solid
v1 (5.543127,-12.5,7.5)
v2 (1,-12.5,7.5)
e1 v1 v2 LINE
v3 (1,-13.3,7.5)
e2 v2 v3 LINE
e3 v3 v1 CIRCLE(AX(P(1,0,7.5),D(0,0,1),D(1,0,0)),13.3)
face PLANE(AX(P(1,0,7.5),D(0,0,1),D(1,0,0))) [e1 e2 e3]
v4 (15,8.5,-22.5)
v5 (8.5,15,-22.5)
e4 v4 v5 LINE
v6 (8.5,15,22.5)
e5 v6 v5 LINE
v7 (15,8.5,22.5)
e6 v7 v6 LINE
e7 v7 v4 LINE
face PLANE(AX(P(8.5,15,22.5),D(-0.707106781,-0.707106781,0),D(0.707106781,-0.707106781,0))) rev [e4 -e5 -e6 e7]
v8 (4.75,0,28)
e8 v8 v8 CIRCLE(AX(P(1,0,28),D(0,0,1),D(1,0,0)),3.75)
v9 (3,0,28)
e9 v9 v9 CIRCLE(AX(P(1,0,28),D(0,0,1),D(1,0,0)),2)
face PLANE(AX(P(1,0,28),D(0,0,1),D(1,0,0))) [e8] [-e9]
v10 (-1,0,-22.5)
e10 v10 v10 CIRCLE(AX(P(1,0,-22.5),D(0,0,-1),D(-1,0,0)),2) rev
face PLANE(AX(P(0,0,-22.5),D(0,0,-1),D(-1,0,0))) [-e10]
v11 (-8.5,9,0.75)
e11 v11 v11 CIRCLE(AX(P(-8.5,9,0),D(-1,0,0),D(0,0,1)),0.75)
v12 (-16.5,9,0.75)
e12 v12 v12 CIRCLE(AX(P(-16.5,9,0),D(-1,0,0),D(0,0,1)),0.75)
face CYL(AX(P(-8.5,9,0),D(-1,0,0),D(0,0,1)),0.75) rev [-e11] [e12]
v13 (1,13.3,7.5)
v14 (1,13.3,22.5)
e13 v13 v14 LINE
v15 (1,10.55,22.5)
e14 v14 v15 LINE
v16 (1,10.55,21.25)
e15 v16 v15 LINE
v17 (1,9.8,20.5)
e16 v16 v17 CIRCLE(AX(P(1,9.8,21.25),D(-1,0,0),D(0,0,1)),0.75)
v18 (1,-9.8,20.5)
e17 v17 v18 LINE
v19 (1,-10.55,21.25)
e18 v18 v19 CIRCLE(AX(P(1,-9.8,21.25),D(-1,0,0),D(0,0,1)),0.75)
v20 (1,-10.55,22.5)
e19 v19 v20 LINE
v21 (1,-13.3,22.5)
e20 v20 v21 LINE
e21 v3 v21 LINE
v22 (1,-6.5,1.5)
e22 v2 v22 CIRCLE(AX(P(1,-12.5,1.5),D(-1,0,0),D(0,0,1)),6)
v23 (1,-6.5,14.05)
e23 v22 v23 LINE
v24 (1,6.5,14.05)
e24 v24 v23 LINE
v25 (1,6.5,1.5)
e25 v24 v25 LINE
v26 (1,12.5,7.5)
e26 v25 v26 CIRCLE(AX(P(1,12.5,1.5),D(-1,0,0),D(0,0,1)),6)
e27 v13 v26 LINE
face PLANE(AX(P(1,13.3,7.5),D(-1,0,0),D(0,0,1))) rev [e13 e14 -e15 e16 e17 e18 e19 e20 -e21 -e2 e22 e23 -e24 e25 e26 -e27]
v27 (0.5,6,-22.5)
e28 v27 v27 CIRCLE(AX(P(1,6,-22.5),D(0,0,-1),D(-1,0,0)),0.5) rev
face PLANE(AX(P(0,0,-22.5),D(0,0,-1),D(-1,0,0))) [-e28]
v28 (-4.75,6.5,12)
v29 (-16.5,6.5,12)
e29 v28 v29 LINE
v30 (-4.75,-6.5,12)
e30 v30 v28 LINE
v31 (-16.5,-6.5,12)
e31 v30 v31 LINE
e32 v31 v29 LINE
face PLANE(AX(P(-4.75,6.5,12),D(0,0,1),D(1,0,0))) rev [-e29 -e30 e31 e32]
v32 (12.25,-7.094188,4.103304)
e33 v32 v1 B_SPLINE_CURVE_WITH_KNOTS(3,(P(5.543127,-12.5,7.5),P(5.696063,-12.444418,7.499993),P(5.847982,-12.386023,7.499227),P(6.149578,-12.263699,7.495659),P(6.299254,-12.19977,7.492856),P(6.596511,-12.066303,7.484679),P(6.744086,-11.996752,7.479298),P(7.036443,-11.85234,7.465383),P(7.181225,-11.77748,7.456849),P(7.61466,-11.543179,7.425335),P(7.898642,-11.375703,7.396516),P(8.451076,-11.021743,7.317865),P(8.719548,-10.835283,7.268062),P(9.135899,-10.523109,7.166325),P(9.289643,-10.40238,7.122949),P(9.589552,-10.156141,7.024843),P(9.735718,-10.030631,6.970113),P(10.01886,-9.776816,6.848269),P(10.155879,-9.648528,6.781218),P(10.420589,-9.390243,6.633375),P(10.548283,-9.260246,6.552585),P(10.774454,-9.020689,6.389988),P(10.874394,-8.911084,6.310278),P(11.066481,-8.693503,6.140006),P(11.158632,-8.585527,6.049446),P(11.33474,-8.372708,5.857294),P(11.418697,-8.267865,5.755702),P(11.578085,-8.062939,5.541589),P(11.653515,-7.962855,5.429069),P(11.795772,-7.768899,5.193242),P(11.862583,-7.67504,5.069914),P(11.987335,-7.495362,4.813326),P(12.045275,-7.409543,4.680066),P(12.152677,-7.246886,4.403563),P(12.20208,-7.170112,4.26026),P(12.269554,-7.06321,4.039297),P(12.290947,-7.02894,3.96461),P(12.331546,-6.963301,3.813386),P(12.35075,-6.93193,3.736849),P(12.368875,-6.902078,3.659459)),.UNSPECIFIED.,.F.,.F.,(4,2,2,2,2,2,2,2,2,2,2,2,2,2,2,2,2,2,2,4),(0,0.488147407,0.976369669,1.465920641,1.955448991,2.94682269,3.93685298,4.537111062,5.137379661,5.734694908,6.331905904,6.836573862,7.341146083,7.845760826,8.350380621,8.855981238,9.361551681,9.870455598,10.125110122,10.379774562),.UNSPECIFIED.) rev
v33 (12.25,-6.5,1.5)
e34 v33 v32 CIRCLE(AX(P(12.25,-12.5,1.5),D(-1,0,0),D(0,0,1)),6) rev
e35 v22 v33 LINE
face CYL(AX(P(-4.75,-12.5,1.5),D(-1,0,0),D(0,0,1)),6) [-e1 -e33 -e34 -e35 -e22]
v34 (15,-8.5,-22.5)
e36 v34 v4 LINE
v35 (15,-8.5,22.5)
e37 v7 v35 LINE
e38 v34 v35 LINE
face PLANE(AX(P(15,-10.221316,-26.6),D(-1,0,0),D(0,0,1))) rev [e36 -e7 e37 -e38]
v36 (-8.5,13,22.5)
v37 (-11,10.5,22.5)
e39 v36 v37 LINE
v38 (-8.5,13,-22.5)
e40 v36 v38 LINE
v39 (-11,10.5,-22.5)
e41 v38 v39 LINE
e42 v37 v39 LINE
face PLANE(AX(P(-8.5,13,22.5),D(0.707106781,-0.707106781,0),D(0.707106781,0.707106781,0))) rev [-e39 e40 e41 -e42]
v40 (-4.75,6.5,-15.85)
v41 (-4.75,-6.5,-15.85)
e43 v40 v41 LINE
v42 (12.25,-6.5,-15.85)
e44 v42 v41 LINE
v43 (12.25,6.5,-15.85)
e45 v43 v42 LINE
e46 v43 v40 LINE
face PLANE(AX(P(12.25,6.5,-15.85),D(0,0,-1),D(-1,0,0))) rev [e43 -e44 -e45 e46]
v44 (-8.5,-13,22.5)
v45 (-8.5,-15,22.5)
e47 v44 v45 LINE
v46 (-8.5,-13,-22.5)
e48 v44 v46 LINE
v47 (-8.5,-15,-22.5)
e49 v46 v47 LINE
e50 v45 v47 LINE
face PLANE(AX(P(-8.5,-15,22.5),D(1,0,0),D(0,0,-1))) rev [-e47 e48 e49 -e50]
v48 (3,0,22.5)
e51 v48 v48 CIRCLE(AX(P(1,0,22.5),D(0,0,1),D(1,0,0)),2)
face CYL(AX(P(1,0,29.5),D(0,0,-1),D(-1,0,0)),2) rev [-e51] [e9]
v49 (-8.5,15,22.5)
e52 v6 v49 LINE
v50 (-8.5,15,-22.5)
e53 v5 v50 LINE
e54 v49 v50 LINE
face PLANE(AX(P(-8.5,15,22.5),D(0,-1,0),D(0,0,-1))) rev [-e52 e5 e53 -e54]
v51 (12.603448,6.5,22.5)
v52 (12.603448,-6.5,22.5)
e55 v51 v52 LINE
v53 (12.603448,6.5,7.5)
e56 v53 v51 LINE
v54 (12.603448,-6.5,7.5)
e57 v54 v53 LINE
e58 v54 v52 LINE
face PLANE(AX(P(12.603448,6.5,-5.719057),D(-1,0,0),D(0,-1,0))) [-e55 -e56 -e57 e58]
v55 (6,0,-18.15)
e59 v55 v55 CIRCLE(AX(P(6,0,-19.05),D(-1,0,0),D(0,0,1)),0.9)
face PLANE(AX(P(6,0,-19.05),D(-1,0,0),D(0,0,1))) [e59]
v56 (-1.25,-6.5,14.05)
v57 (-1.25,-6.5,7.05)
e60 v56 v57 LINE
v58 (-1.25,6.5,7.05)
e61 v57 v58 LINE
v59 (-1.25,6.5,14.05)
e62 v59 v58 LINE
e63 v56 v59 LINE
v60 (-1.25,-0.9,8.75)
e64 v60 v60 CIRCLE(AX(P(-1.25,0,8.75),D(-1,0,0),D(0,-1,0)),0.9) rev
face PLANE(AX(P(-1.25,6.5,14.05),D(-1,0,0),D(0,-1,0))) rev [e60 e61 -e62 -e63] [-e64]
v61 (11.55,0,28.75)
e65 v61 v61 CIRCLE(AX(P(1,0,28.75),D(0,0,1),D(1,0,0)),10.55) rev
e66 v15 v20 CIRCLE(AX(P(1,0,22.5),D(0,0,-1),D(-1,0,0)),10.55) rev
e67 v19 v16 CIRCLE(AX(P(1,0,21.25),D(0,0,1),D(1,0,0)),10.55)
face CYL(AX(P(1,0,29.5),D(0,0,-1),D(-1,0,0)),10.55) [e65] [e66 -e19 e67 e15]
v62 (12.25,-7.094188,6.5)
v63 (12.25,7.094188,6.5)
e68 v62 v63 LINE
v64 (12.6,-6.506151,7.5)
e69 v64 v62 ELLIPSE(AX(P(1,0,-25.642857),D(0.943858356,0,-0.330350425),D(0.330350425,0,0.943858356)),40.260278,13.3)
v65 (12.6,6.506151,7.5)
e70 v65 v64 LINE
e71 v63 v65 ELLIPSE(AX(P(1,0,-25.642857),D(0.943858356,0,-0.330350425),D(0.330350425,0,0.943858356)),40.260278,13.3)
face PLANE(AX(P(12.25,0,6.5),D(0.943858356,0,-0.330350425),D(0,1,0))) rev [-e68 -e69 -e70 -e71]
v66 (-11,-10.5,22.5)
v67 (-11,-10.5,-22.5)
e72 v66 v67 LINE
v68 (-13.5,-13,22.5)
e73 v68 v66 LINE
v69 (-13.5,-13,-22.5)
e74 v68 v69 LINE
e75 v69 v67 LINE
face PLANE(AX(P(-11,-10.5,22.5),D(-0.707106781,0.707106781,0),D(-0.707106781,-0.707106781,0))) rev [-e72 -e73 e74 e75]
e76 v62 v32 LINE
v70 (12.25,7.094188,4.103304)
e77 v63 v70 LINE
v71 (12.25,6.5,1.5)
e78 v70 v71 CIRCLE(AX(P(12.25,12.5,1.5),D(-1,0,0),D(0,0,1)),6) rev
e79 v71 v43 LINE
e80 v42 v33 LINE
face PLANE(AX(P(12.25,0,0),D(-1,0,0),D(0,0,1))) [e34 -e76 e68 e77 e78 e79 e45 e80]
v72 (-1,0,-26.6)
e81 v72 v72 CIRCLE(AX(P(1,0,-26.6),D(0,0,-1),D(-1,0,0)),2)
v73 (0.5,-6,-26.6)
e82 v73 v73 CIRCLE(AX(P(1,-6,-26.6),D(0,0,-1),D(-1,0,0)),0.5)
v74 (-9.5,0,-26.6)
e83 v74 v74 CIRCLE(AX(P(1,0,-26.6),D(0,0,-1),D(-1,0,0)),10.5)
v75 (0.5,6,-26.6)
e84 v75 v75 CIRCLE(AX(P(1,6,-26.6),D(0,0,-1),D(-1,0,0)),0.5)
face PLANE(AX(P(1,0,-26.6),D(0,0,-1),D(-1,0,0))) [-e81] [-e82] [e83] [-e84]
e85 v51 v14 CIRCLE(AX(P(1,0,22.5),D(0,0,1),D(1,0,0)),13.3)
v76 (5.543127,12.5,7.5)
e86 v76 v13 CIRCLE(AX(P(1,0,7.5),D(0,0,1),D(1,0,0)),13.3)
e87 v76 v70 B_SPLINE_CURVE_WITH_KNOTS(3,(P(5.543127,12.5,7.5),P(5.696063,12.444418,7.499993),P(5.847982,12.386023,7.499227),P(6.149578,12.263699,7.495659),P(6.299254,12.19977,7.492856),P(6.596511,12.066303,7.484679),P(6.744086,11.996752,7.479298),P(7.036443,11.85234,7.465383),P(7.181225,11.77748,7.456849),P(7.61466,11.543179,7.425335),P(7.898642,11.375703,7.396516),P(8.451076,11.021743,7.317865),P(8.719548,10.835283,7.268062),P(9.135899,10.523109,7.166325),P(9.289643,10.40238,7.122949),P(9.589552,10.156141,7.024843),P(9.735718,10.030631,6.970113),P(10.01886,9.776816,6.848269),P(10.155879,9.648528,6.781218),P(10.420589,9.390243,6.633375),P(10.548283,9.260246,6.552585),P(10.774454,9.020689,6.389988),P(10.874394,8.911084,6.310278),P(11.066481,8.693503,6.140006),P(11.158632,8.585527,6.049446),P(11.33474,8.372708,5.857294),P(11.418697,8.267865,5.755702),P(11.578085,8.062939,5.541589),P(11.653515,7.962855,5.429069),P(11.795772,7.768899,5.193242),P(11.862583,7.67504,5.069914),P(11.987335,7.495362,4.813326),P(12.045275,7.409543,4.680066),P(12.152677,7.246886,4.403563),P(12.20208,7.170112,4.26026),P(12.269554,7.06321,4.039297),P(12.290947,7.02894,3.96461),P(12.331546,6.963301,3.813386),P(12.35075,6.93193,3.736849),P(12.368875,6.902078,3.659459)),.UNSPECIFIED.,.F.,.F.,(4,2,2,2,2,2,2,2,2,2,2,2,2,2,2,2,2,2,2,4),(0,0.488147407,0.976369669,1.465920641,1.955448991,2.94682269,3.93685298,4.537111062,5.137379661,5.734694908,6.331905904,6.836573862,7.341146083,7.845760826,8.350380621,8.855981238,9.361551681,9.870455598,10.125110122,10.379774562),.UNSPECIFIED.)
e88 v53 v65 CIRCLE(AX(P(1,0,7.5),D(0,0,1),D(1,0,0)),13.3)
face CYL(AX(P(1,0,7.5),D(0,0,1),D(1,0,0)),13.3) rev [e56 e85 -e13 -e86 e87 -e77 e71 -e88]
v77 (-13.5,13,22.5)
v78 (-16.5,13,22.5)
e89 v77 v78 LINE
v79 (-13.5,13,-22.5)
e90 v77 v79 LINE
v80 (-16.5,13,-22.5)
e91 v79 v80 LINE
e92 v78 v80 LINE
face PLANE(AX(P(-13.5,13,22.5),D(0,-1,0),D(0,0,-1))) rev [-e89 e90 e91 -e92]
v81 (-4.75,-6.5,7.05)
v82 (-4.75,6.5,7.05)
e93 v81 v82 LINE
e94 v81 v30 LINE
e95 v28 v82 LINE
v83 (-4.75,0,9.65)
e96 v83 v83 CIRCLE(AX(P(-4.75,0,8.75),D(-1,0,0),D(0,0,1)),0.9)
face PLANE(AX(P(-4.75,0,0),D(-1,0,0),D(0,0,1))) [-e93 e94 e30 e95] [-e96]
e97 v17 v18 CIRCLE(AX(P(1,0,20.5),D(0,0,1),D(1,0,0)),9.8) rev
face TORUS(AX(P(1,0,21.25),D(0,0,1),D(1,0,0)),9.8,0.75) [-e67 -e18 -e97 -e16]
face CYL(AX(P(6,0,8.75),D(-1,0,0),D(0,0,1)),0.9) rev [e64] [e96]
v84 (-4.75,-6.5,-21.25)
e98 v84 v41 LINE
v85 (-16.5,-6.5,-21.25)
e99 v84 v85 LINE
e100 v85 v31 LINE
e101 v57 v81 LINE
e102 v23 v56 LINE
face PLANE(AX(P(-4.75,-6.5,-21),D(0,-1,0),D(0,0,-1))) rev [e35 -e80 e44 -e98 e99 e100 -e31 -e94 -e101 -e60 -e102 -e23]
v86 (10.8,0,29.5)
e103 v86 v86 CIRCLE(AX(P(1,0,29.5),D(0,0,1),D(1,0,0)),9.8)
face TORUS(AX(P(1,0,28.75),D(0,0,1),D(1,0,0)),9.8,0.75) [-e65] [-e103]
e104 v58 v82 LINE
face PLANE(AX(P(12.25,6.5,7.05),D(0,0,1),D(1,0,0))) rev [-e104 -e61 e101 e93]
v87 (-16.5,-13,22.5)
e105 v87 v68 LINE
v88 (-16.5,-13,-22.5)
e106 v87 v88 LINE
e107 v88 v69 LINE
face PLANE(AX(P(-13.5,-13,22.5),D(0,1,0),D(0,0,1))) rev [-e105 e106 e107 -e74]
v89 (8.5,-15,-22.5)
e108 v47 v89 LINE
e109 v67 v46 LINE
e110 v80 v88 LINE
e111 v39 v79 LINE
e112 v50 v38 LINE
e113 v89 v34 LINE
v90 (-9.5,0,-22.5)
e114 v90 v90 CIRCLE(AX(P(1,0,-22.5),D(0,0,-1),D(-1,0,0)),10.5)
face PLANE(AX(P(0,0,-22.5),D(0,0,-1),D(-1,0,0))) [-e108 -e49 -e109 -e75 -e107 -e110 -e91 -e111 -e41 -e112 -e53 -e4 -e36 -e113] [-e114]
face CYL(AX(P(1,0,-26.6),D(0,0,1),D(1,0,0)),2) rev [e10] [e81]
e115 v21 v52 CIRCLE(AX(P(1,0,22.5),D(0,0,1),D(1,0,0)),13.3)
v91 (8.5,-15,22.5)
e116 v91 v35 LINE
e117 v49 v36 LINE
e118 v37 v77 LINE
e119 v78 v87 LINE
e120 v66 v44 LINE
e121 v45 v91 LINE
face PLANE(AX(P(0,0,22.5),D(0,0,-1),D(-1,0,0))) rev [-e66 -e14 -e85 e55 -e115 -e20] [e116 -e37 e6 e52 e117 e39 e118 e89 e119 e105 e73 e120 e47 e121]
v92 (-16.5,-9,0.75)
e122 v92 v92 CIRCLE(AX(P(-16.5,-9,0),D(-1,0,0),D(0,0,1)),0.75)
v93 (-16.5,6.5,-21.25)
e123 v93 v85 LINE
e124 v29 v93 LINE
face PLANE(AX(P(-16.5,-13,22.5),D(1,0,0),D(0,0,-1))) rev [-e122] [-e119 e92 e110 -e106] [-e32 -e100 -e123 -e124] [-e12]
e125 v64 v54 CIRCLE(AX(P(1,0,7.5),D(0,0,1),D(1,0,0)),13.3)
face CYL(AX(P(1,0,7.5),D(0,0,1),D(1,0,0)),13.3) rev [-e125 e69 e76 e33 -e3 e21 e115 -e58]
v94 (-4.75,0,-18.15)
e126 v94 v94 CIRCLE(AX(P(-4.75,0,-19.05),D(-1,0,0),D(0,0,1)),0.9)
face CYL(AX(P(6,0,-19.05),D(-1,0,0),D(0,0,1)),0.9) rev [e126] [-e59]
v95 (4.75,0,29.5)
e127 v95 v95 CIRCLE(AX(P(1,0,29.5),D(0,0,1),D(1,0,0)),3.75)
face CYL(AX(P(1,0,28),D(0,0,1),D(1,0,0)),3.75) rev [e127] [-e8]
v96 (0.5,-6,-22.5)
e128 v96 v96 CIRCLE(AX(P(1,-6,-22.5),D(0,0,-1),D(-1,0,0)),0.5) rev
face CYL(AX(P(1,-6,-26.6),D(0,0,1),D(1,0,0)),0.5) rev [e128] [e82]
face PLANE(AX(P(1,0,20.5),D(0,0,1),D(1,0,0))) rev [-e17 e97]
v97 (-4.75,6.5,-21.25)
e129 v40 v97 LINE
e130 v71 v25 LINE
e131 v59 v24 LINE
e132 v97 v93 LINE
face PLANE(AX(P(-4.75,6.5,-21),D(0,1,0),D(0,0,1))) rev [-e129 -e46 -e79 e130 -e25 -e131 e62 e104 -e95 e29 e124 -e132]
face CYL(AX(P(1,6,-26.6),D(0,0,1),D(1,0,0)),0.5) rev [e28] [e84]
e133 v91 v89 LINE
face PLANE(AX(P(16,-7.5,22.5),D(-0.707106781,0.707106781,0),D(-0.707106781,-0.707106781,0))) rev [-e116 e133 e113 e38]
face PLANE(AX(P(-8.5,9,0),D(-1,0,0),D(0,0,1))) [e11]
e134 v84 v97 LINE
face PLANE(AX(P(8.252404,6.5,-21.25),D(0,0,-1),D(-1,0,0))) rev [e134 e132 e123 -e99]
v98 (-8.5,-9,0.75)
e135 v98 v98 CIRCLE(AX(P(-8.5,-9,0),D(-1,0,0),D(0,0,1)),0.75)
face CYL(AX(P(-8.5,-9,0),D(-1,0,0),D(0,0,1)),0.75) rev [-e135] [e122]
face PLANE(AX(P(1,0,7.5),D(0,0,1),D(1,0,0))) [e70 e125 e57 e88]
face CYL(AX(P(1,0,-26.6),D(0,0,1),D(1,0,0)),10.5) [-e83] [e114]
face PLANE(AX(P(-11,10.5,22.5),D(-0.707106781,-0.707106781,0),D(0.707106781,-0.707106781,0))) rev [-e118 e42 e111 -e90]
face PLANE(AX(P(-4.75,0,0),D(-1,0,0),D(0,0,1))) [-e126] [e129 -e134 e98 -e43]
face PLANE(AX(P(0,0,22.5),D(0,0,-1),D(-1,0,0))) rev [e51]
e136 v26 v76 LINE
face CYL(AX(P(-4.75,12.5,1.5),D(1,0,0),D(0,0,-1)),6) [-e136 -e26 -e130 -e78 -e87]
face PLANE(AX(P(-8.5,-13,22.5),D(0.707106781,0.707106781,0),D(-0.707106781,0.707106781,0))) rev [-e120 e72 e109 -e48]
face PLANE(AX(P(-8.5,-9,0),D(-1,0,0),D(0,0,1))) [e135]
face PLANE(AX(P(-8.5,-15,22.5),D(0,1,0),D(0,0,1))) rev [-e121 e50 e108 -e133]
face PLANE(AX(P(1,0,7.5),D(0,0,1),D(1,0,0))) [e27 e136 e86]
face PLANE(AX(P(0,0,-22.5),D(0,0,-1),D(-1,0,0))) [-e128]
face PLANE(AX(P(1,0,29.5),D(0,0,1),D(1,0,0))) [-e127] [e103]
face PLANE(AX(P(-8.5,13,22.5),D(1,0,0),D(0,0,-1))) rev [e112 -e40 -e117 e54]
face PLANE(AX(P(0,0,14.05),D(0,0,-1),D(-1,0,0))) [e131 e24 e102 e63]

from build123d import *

# Parameters (mm, degrees)
BOSS_EXTRUDE1_DEPTH = 22.5
SKETCH2_R           = 10.5
SKETCH2_R_2         = 2
SKETCH2_R_3         = 0.5
BOSS_EXTRUDE2_DEPTH = 4.1
BOSS_EXTRUDE3_START = 7
SKETCH4_R           = 10.55
SKETCH4_R_2         = 2
BOSS_EXTRUDE3_DEPTH = 7
SKETCH5_R           = 3.75
CUT_EXTRUDE1_DEPTH  = 1.5
CUT_EXTRUDE2_DEPTH  = 15
SKETCH8_W           = 33
SKETCH8_H           = 13
CUT_EXTRUDE4_DEPTH  = 11.75
SKETCH9_W           = 22.9
SKETCH9_H           = 13
CUT_EXTRUDE5_DEPTH  = 17
SKETCH10_R          = 0.75
CUT_EXTRUDE6_DEPTH  = 8
SKETCH11_R          = 0.9
CUT_EXTRUDE7_DEPTH  = 10.75
CUT_EXTRUDE8_DEPTH  = 13
FILLET2_R           = 0.75
SKETCH14_W          = 13.5
SKETCH14_H          = 13
CUT_EXTRUDE9_DEPTH  = 7
FILLET3_R           = 6
SKETCH15_W          = 2
SKETCH15_H          = 20.442632008
CUT_EXTRUDE10_DEPTH = 54.926431367
SKETCH16_W          = 2.396552237
SKETCH16_H          = 13
BOSS_EXTRUDE5_DEPTH = 15
CHAMFER1_SIZE       = 0.35
CHAMFER1_SIZE_2     = 1
SKETCH17_W          = 0.25
SKETCH17_H          = 13
CUT_EXTRUDE11_DEPTH = 11.75


with BuildPart() as part:
    # Sketch1 → Boss-Extrude1 (new, symmetric)
    with BuildSketch(Plane.XY):
        Polygon((8.5, 15), (16, 7.5), (16, -7.5), (8.5, -15), (-8.5, -15), (-8.5, -13), (-11, -10.5), (-13.5, -13), (-16.5, -13), (-16.5, 13), (-13.5, 13), (-11, 10.5), (-8.5, 13), (-8.5, 15), align=None)
    extrude(amount=BOSS_EXTRUDE1_DEPTH, both=True)

    # Sketch2 → Boss-Extrude2 (add)
    with BuildSketch(Plane(origin=(0, 0, -22.5), x_dir=(-1, 0, 0), z_dir=(0, 0, -1))):
        with Locations((-1, 0)):
            Circle(SKETCH2_R)
        with Locations((-1, 0)):
            Circle(SKETCH2_R_2, mode=Mode.SUBTRACT)
        with Locations((-1, 6)):
            Circle(SKETCH2_R_3, mode=Mode.SUBTRACT)
        with Locations((-1, -6)):
            Circle(SKETCH2_R_3, mode=Mode.SUBTRACT)
    extrude(amount=BOSS_EXTRUDE2_DEPTH)

    # Sketch4 → Boss-Extrude3 (add)
    with BuildSketch(Plane.XY.offset(22.5).offset(BOSS_EXTRUDE3_START)):
        with Locations(Location((1, 0, 0), (0, 0, 180))):
            Circle(SKETCH4_R)
        with Locations(Location((1, 0, 0), (0, 0, 180))):
            Circle(SKETCH4_R_2, mode=Mode.SUBTRACT)
    extrude(amount=-BOSS_EXTRUDE3_DEPTH)

    # Sketch5 → Cut-Extrude1 (cut)
    with BuildSketch(Plane.XY.offset(29.5)):
        with Locations((1, 0)):
            Circle(SKETCH5_R)
    extrude(amount=-CUT_EXTRUDE1_DEPTH, mode=Mode.SUBTRACT)

    # Sketch6 → Cut-Extrude2 (cut)
    with BuildSketch(Plane.XY.offset(22.5)):
        with BuildLine():
            Line((1, 13.3), (1, 10.55))
            ThreePointArc((1, 10.55), (11.55, 0), (1, -10.55))
            Line((1, -10.55), (1, -13.3))
            ThreePointArc((1, -13.3), (14.3, 0), (1, 13.3))
        make_face()
    extrude(amount=-CUT_EXTRUDE2_DEPTH, mode=Mode.SUBTRACT)

    # Sketch8 → Cut-Extrude4 (cut)
    with BuildSketch(Plane.ZY.offset(16.5)):
        with Locations((-4.5, 0)):
            Rectangle(SKETCH8_W, SKETCH8_H)
    extrude(amount=-CUT_EXTRUDE4_DEPTH, mode=Mode.SUBTRACT)

    # Sketch9 → Cut-Extrude5 (cut)
    with BuildSketch(Plane.ZY.offset(4.75)):
        with Locations((-4.4, 0)):
            Rectangle(SKETCH9_W, SKETCH9_H)
    extrude(amount=-CUT_EXTRUDE5_DEPTH, mode=Mode.SUBTRACT)

    # Sketch10 → Cut-Extrude6 (cut)
    with BuildSketch(Plane.ZY.offset(16.5)):
        with Locations((0, 9)):
            Circle(SKETCH10_R)
        with Locations((0, -9)):
            Circle(SKETCH10_R)
    extrude(amount=-CUT_EXTRUDE6_DEPTH, mode=Mode.SUBTRACT)

    # Sketch11 → Cut-Extrude7 (cut)
    with BuildSketch(Plane.ZY.offset(4.75)):
        with Locations((-19.05, 0)):
            Circle(SKETCH11_R)
        with Locations((8.75, 0)):
            Circle(SKETCH11_R)
    extrude(amount=-CUT_EXTRUDE7_DEPTH, mode=Mode.SUBTRACT)

    # Sketch12 → Cut-Extrude8 (cut)
    with BuildSketch(Plane.XY.offset(20.5)):
        with BuildLine():
            Line((1, 13.3), (1, -13.3))
            ThreePointArc((1, -13.3), (14.3, 0), (1, 13.3))
        make_face()
    extrude(amount=-CUT_EXTRUDE8_DEPTH, mode=Mode.SUBTRACT)

    # Fillet2
    fillet2_edges = [part.edges().sort_by_distance(p)[0] for p in [
        (11.55, 0, 20.5),
        (11.55, 0, 29.5),
    ]]
    fillet(fillet2_edges, radius=FILLET2_R)

    # Sketch14 → Cut-Extrude9 (cut)
    with BuildSketch(Plane(origin=(0, 0, 7.05), x_dir=(-1, 0, 0), z_dir=(0, 0, -1))):
        with Locations((-5.5, 0)):
            Rectangle(SKETCH14_W, SKETCH14_H)
    extrude(amount=-CUT_EXTRUDE9_DEPTH, mode=Mode.SUBTRACT)

    # Fillet3
    # the kernel refuses this fillet: 6 mm, written as the material it takes off along each edge
    with BuildSketch(Plane(origin=(1, 6.5, 7.5), x_dir=(0, 0, -1), z_dir=(1, 0, 0))) as fillet3_piece_1_section:
        with BuildLine():
            CenterArc((FILLET3_R, FILLET3_R), FILLET3_R, 180, 90)
            Line((0, FILLET3_R), (0, 0))
            Line((0, 0), (FILLET3_R, 0))
        make_face()
    fillet3_piece_1 = extrude(amount=8.309783391, mode=Mode.PRIVATE)
    fillet3_piece_1 = fillet3_piece_1 & Plane(origin=(1, 0, 5.762056744), x_dir=(0, -1, 0), z_dir=(0, 0, 1)) * Cylinder(13.3, 41, mode=Mode.PRIVATE)
    add(fillet3_piece_1, mode=Mode.SUBTRACT)
    with BuildSketch(Plane(origin=(9.309783391, -6.5, 7.5), x_dir=(0, -1, 0), z_dir=(-1, 0, 0))) as fillet3_piece_2_section:
        with BuildLine():
            CenterArc((FILLET3_R, -FILLET3_R), FILLET3_R, 90, 90)
            Line((0, -FILLET3_R), (0, 0))
            Line((0, 0), (FILLET3_R, 0))
        make_face()
    fillet3_piece_2 = extrude(amount=8.309783391, mode=Mode.PRIVATE)
    fillet3_piece_2 = fillet3_piece_2 & Plane(origin=(1, 0, 7.288583483), x_dir=(0, -1, 0), z_dir=(0, 0, 1)) * Cylinder(13.3, 41, mode=Mode.PRIVATE)
    add(fillet3_piece_2, mode=Mode.SUBTRACT)
    with BuildSketch(Plane(origin=(12.25, -6.5, 7.5), x_dir=(0, 0, -1), z_dir=(-1, 0, 0))) as fillet3_piece_3_section:
        with BuildLine():
            CenterArc((FILLET3_R, FILLET3_R), FILLET3_R, 180, 90)
            Line((0, FILLET3_R), (0, 0))
            Line((0, 0), (FILLET3_R, 0))
        make_face()
    fillet3_piece_3 = extrude(amount=2.940216609, mode=Mode.PRIVATE)
    fillet3_piece_3 = fillet3_piece_3 & Plane(origin=(1, 0, 5.940678517), x_dir=(0, -1, 0), z_dir=(0, 0, 1)) * Cylinder(13.3, 30, mode=Mode.PRIVATE)
    add(fillet3_piece_3, mode=Mode.SUBTRACT)
    with BuildSketch(Plane(origin=(9.309783391, 6.5, 7.5), x_dir=(0, 0, -1), z_dir=(1, 0, 0))) as fillet3_piece_4_section:
        with BuildLine():
            CenterArc((FILLET3_R, FILLET3_R), FILLET3_R, 180, 90)
            Line((0, FILLET3_R), (0, 0))
            Line((0, 0), (FILLET3_R, 0))
        make_face()
    fillet3_piece_4 = extrude(amount=2.940216609, mode=Mode.PRIVATE)
    fillet3_piece_4 = fillet3_piece_4 & Plane(origin=(1, 0, 5.940678478), x_dir=(0, -1, 0), z_dir=(0, 0, 1)) * Cylinder(13.3, 30, mode=Mode.PRIVATE)
    add(fillet3_piece_4, mode=Mode.SUBTRACT)

    # Sketch15 → Cut-Extrude10 (cut, through all)
    with BuildSketch(Plane.XY.offset(22.5)):
        with Locations((16, 0)):
            Rectangle(SKETCH15_W, SKETCH15_H)
    extrude(amount=-CUT_EXTRUDE10_DEPTH, mode=Mode.SUBTRACT)

    # Sketch16 → Boss-Extrude5 (add)
    with BuildSketch(Plane.XY.offset(22.5)):
        with Locations((13.801723882, 0)):
            Rectangle(SKETCH16_W, SKETCH16_H)
    extrude(amount=-BOSS_EXTRUDE5_DEPTH)

    # Chamfer1
    # the kernel refuses this chamfer: 1, 0.35 mm, written as the material it takes off along each edge
    with BuildSketch(Plane(origin=(12.25, 6.5, 7.5), x_dir=(0.9946410899892074, 0, 0.10338811394488918), z_dir=(0, -1, 0))) as chamfer1_piece_1:
        Polygon((CHAMFER1_SIZE * 0.994641089989, -CHAMFER1_SIZE * 0.103388113945), (-CHAMFER1_SIZE_2 * 0.103388113945, -CHAMFER1_SIZE_2 * 0.994641089989), (0, 0), align=None)
    extrude(amount=13, mode=Mode.SUBTRACT)
    with BuildSketch(Plane(origin=(12.25, 9.688783911, 7.5), x_dir=(0.9946410899892074, 0, 0.10338811394488918), z_dir=(0, -1, 0))) as chamfer1_piece_2_section:
        Polygon((CHAMFER1_SIZE * 0.994641089989, -CHAMFER1_SIZE * 0.103388113945), (-CHAMFER1_SIZE_2 * 0.103388113945, -CHAMFER1_SIZE_2 * 0.994641089989), (0, 0), align=None)
    chamfer1_piece_2 = extrude(amount=3.188783911, mode=Mode.PRIVATE)
    chamfer1_piece_2 = chamfer1_piece_2 & Plane(origin=(1, 0, 7.126715107), x_dir=(0, -1, 0), z_dir=(0, 0, 1)) * Cylinder(13.3, 11, mode=Mode.PRIVATE)
    add(chamfer1_piece_2, mode=Mode.SUBTRACT)
    with BuildSketch(Plane(origin=(12.25, -9.688783911, 7.5), x_dir=(0.9946410899892074, 0, 0.10338811394488918), z_dir=(0, 1, 0))) as chamfer1_piece_3_section:
        Polygon((CHAMFER1_SIZE * 0.994641089989, CHAMFER1_SIZE * 0.103388113945), (-CHAMFER1_SIZE_2 * 0.103388113945, CHAMFER1_SIZE_2 * 0.994641089989), (0, 0), align=None)
    chamfer1_piece_3 = extrude(amount=3.188783911, mode=Mode.PRIVATE)
    chamfer1_piece_3 = chamfer1_piece_3 & Plane(origin=(1, 0, 7.126715107), x_dir=(0, -1, 0), z_dir=(0, 0, 1)) * Cylinder(13.3, 11, mode=Mode.PRIVATE)
    add(chamfer1_piece_3, mode=Mode.SUBTRACT)

    # Sketch17 → Cut-Extrude11 (cut)
    with BuildSketch(Plane.ZY.offset(16.5)):
        with Locations((-21.125, 0)):
            Rectangle(SKETCH17_W, SKETCH17_H)
    extrude(amount=-CUT_EXTRUDE11_DEPTH, mode=Mode.SUBTRACT)


solid = part.part
